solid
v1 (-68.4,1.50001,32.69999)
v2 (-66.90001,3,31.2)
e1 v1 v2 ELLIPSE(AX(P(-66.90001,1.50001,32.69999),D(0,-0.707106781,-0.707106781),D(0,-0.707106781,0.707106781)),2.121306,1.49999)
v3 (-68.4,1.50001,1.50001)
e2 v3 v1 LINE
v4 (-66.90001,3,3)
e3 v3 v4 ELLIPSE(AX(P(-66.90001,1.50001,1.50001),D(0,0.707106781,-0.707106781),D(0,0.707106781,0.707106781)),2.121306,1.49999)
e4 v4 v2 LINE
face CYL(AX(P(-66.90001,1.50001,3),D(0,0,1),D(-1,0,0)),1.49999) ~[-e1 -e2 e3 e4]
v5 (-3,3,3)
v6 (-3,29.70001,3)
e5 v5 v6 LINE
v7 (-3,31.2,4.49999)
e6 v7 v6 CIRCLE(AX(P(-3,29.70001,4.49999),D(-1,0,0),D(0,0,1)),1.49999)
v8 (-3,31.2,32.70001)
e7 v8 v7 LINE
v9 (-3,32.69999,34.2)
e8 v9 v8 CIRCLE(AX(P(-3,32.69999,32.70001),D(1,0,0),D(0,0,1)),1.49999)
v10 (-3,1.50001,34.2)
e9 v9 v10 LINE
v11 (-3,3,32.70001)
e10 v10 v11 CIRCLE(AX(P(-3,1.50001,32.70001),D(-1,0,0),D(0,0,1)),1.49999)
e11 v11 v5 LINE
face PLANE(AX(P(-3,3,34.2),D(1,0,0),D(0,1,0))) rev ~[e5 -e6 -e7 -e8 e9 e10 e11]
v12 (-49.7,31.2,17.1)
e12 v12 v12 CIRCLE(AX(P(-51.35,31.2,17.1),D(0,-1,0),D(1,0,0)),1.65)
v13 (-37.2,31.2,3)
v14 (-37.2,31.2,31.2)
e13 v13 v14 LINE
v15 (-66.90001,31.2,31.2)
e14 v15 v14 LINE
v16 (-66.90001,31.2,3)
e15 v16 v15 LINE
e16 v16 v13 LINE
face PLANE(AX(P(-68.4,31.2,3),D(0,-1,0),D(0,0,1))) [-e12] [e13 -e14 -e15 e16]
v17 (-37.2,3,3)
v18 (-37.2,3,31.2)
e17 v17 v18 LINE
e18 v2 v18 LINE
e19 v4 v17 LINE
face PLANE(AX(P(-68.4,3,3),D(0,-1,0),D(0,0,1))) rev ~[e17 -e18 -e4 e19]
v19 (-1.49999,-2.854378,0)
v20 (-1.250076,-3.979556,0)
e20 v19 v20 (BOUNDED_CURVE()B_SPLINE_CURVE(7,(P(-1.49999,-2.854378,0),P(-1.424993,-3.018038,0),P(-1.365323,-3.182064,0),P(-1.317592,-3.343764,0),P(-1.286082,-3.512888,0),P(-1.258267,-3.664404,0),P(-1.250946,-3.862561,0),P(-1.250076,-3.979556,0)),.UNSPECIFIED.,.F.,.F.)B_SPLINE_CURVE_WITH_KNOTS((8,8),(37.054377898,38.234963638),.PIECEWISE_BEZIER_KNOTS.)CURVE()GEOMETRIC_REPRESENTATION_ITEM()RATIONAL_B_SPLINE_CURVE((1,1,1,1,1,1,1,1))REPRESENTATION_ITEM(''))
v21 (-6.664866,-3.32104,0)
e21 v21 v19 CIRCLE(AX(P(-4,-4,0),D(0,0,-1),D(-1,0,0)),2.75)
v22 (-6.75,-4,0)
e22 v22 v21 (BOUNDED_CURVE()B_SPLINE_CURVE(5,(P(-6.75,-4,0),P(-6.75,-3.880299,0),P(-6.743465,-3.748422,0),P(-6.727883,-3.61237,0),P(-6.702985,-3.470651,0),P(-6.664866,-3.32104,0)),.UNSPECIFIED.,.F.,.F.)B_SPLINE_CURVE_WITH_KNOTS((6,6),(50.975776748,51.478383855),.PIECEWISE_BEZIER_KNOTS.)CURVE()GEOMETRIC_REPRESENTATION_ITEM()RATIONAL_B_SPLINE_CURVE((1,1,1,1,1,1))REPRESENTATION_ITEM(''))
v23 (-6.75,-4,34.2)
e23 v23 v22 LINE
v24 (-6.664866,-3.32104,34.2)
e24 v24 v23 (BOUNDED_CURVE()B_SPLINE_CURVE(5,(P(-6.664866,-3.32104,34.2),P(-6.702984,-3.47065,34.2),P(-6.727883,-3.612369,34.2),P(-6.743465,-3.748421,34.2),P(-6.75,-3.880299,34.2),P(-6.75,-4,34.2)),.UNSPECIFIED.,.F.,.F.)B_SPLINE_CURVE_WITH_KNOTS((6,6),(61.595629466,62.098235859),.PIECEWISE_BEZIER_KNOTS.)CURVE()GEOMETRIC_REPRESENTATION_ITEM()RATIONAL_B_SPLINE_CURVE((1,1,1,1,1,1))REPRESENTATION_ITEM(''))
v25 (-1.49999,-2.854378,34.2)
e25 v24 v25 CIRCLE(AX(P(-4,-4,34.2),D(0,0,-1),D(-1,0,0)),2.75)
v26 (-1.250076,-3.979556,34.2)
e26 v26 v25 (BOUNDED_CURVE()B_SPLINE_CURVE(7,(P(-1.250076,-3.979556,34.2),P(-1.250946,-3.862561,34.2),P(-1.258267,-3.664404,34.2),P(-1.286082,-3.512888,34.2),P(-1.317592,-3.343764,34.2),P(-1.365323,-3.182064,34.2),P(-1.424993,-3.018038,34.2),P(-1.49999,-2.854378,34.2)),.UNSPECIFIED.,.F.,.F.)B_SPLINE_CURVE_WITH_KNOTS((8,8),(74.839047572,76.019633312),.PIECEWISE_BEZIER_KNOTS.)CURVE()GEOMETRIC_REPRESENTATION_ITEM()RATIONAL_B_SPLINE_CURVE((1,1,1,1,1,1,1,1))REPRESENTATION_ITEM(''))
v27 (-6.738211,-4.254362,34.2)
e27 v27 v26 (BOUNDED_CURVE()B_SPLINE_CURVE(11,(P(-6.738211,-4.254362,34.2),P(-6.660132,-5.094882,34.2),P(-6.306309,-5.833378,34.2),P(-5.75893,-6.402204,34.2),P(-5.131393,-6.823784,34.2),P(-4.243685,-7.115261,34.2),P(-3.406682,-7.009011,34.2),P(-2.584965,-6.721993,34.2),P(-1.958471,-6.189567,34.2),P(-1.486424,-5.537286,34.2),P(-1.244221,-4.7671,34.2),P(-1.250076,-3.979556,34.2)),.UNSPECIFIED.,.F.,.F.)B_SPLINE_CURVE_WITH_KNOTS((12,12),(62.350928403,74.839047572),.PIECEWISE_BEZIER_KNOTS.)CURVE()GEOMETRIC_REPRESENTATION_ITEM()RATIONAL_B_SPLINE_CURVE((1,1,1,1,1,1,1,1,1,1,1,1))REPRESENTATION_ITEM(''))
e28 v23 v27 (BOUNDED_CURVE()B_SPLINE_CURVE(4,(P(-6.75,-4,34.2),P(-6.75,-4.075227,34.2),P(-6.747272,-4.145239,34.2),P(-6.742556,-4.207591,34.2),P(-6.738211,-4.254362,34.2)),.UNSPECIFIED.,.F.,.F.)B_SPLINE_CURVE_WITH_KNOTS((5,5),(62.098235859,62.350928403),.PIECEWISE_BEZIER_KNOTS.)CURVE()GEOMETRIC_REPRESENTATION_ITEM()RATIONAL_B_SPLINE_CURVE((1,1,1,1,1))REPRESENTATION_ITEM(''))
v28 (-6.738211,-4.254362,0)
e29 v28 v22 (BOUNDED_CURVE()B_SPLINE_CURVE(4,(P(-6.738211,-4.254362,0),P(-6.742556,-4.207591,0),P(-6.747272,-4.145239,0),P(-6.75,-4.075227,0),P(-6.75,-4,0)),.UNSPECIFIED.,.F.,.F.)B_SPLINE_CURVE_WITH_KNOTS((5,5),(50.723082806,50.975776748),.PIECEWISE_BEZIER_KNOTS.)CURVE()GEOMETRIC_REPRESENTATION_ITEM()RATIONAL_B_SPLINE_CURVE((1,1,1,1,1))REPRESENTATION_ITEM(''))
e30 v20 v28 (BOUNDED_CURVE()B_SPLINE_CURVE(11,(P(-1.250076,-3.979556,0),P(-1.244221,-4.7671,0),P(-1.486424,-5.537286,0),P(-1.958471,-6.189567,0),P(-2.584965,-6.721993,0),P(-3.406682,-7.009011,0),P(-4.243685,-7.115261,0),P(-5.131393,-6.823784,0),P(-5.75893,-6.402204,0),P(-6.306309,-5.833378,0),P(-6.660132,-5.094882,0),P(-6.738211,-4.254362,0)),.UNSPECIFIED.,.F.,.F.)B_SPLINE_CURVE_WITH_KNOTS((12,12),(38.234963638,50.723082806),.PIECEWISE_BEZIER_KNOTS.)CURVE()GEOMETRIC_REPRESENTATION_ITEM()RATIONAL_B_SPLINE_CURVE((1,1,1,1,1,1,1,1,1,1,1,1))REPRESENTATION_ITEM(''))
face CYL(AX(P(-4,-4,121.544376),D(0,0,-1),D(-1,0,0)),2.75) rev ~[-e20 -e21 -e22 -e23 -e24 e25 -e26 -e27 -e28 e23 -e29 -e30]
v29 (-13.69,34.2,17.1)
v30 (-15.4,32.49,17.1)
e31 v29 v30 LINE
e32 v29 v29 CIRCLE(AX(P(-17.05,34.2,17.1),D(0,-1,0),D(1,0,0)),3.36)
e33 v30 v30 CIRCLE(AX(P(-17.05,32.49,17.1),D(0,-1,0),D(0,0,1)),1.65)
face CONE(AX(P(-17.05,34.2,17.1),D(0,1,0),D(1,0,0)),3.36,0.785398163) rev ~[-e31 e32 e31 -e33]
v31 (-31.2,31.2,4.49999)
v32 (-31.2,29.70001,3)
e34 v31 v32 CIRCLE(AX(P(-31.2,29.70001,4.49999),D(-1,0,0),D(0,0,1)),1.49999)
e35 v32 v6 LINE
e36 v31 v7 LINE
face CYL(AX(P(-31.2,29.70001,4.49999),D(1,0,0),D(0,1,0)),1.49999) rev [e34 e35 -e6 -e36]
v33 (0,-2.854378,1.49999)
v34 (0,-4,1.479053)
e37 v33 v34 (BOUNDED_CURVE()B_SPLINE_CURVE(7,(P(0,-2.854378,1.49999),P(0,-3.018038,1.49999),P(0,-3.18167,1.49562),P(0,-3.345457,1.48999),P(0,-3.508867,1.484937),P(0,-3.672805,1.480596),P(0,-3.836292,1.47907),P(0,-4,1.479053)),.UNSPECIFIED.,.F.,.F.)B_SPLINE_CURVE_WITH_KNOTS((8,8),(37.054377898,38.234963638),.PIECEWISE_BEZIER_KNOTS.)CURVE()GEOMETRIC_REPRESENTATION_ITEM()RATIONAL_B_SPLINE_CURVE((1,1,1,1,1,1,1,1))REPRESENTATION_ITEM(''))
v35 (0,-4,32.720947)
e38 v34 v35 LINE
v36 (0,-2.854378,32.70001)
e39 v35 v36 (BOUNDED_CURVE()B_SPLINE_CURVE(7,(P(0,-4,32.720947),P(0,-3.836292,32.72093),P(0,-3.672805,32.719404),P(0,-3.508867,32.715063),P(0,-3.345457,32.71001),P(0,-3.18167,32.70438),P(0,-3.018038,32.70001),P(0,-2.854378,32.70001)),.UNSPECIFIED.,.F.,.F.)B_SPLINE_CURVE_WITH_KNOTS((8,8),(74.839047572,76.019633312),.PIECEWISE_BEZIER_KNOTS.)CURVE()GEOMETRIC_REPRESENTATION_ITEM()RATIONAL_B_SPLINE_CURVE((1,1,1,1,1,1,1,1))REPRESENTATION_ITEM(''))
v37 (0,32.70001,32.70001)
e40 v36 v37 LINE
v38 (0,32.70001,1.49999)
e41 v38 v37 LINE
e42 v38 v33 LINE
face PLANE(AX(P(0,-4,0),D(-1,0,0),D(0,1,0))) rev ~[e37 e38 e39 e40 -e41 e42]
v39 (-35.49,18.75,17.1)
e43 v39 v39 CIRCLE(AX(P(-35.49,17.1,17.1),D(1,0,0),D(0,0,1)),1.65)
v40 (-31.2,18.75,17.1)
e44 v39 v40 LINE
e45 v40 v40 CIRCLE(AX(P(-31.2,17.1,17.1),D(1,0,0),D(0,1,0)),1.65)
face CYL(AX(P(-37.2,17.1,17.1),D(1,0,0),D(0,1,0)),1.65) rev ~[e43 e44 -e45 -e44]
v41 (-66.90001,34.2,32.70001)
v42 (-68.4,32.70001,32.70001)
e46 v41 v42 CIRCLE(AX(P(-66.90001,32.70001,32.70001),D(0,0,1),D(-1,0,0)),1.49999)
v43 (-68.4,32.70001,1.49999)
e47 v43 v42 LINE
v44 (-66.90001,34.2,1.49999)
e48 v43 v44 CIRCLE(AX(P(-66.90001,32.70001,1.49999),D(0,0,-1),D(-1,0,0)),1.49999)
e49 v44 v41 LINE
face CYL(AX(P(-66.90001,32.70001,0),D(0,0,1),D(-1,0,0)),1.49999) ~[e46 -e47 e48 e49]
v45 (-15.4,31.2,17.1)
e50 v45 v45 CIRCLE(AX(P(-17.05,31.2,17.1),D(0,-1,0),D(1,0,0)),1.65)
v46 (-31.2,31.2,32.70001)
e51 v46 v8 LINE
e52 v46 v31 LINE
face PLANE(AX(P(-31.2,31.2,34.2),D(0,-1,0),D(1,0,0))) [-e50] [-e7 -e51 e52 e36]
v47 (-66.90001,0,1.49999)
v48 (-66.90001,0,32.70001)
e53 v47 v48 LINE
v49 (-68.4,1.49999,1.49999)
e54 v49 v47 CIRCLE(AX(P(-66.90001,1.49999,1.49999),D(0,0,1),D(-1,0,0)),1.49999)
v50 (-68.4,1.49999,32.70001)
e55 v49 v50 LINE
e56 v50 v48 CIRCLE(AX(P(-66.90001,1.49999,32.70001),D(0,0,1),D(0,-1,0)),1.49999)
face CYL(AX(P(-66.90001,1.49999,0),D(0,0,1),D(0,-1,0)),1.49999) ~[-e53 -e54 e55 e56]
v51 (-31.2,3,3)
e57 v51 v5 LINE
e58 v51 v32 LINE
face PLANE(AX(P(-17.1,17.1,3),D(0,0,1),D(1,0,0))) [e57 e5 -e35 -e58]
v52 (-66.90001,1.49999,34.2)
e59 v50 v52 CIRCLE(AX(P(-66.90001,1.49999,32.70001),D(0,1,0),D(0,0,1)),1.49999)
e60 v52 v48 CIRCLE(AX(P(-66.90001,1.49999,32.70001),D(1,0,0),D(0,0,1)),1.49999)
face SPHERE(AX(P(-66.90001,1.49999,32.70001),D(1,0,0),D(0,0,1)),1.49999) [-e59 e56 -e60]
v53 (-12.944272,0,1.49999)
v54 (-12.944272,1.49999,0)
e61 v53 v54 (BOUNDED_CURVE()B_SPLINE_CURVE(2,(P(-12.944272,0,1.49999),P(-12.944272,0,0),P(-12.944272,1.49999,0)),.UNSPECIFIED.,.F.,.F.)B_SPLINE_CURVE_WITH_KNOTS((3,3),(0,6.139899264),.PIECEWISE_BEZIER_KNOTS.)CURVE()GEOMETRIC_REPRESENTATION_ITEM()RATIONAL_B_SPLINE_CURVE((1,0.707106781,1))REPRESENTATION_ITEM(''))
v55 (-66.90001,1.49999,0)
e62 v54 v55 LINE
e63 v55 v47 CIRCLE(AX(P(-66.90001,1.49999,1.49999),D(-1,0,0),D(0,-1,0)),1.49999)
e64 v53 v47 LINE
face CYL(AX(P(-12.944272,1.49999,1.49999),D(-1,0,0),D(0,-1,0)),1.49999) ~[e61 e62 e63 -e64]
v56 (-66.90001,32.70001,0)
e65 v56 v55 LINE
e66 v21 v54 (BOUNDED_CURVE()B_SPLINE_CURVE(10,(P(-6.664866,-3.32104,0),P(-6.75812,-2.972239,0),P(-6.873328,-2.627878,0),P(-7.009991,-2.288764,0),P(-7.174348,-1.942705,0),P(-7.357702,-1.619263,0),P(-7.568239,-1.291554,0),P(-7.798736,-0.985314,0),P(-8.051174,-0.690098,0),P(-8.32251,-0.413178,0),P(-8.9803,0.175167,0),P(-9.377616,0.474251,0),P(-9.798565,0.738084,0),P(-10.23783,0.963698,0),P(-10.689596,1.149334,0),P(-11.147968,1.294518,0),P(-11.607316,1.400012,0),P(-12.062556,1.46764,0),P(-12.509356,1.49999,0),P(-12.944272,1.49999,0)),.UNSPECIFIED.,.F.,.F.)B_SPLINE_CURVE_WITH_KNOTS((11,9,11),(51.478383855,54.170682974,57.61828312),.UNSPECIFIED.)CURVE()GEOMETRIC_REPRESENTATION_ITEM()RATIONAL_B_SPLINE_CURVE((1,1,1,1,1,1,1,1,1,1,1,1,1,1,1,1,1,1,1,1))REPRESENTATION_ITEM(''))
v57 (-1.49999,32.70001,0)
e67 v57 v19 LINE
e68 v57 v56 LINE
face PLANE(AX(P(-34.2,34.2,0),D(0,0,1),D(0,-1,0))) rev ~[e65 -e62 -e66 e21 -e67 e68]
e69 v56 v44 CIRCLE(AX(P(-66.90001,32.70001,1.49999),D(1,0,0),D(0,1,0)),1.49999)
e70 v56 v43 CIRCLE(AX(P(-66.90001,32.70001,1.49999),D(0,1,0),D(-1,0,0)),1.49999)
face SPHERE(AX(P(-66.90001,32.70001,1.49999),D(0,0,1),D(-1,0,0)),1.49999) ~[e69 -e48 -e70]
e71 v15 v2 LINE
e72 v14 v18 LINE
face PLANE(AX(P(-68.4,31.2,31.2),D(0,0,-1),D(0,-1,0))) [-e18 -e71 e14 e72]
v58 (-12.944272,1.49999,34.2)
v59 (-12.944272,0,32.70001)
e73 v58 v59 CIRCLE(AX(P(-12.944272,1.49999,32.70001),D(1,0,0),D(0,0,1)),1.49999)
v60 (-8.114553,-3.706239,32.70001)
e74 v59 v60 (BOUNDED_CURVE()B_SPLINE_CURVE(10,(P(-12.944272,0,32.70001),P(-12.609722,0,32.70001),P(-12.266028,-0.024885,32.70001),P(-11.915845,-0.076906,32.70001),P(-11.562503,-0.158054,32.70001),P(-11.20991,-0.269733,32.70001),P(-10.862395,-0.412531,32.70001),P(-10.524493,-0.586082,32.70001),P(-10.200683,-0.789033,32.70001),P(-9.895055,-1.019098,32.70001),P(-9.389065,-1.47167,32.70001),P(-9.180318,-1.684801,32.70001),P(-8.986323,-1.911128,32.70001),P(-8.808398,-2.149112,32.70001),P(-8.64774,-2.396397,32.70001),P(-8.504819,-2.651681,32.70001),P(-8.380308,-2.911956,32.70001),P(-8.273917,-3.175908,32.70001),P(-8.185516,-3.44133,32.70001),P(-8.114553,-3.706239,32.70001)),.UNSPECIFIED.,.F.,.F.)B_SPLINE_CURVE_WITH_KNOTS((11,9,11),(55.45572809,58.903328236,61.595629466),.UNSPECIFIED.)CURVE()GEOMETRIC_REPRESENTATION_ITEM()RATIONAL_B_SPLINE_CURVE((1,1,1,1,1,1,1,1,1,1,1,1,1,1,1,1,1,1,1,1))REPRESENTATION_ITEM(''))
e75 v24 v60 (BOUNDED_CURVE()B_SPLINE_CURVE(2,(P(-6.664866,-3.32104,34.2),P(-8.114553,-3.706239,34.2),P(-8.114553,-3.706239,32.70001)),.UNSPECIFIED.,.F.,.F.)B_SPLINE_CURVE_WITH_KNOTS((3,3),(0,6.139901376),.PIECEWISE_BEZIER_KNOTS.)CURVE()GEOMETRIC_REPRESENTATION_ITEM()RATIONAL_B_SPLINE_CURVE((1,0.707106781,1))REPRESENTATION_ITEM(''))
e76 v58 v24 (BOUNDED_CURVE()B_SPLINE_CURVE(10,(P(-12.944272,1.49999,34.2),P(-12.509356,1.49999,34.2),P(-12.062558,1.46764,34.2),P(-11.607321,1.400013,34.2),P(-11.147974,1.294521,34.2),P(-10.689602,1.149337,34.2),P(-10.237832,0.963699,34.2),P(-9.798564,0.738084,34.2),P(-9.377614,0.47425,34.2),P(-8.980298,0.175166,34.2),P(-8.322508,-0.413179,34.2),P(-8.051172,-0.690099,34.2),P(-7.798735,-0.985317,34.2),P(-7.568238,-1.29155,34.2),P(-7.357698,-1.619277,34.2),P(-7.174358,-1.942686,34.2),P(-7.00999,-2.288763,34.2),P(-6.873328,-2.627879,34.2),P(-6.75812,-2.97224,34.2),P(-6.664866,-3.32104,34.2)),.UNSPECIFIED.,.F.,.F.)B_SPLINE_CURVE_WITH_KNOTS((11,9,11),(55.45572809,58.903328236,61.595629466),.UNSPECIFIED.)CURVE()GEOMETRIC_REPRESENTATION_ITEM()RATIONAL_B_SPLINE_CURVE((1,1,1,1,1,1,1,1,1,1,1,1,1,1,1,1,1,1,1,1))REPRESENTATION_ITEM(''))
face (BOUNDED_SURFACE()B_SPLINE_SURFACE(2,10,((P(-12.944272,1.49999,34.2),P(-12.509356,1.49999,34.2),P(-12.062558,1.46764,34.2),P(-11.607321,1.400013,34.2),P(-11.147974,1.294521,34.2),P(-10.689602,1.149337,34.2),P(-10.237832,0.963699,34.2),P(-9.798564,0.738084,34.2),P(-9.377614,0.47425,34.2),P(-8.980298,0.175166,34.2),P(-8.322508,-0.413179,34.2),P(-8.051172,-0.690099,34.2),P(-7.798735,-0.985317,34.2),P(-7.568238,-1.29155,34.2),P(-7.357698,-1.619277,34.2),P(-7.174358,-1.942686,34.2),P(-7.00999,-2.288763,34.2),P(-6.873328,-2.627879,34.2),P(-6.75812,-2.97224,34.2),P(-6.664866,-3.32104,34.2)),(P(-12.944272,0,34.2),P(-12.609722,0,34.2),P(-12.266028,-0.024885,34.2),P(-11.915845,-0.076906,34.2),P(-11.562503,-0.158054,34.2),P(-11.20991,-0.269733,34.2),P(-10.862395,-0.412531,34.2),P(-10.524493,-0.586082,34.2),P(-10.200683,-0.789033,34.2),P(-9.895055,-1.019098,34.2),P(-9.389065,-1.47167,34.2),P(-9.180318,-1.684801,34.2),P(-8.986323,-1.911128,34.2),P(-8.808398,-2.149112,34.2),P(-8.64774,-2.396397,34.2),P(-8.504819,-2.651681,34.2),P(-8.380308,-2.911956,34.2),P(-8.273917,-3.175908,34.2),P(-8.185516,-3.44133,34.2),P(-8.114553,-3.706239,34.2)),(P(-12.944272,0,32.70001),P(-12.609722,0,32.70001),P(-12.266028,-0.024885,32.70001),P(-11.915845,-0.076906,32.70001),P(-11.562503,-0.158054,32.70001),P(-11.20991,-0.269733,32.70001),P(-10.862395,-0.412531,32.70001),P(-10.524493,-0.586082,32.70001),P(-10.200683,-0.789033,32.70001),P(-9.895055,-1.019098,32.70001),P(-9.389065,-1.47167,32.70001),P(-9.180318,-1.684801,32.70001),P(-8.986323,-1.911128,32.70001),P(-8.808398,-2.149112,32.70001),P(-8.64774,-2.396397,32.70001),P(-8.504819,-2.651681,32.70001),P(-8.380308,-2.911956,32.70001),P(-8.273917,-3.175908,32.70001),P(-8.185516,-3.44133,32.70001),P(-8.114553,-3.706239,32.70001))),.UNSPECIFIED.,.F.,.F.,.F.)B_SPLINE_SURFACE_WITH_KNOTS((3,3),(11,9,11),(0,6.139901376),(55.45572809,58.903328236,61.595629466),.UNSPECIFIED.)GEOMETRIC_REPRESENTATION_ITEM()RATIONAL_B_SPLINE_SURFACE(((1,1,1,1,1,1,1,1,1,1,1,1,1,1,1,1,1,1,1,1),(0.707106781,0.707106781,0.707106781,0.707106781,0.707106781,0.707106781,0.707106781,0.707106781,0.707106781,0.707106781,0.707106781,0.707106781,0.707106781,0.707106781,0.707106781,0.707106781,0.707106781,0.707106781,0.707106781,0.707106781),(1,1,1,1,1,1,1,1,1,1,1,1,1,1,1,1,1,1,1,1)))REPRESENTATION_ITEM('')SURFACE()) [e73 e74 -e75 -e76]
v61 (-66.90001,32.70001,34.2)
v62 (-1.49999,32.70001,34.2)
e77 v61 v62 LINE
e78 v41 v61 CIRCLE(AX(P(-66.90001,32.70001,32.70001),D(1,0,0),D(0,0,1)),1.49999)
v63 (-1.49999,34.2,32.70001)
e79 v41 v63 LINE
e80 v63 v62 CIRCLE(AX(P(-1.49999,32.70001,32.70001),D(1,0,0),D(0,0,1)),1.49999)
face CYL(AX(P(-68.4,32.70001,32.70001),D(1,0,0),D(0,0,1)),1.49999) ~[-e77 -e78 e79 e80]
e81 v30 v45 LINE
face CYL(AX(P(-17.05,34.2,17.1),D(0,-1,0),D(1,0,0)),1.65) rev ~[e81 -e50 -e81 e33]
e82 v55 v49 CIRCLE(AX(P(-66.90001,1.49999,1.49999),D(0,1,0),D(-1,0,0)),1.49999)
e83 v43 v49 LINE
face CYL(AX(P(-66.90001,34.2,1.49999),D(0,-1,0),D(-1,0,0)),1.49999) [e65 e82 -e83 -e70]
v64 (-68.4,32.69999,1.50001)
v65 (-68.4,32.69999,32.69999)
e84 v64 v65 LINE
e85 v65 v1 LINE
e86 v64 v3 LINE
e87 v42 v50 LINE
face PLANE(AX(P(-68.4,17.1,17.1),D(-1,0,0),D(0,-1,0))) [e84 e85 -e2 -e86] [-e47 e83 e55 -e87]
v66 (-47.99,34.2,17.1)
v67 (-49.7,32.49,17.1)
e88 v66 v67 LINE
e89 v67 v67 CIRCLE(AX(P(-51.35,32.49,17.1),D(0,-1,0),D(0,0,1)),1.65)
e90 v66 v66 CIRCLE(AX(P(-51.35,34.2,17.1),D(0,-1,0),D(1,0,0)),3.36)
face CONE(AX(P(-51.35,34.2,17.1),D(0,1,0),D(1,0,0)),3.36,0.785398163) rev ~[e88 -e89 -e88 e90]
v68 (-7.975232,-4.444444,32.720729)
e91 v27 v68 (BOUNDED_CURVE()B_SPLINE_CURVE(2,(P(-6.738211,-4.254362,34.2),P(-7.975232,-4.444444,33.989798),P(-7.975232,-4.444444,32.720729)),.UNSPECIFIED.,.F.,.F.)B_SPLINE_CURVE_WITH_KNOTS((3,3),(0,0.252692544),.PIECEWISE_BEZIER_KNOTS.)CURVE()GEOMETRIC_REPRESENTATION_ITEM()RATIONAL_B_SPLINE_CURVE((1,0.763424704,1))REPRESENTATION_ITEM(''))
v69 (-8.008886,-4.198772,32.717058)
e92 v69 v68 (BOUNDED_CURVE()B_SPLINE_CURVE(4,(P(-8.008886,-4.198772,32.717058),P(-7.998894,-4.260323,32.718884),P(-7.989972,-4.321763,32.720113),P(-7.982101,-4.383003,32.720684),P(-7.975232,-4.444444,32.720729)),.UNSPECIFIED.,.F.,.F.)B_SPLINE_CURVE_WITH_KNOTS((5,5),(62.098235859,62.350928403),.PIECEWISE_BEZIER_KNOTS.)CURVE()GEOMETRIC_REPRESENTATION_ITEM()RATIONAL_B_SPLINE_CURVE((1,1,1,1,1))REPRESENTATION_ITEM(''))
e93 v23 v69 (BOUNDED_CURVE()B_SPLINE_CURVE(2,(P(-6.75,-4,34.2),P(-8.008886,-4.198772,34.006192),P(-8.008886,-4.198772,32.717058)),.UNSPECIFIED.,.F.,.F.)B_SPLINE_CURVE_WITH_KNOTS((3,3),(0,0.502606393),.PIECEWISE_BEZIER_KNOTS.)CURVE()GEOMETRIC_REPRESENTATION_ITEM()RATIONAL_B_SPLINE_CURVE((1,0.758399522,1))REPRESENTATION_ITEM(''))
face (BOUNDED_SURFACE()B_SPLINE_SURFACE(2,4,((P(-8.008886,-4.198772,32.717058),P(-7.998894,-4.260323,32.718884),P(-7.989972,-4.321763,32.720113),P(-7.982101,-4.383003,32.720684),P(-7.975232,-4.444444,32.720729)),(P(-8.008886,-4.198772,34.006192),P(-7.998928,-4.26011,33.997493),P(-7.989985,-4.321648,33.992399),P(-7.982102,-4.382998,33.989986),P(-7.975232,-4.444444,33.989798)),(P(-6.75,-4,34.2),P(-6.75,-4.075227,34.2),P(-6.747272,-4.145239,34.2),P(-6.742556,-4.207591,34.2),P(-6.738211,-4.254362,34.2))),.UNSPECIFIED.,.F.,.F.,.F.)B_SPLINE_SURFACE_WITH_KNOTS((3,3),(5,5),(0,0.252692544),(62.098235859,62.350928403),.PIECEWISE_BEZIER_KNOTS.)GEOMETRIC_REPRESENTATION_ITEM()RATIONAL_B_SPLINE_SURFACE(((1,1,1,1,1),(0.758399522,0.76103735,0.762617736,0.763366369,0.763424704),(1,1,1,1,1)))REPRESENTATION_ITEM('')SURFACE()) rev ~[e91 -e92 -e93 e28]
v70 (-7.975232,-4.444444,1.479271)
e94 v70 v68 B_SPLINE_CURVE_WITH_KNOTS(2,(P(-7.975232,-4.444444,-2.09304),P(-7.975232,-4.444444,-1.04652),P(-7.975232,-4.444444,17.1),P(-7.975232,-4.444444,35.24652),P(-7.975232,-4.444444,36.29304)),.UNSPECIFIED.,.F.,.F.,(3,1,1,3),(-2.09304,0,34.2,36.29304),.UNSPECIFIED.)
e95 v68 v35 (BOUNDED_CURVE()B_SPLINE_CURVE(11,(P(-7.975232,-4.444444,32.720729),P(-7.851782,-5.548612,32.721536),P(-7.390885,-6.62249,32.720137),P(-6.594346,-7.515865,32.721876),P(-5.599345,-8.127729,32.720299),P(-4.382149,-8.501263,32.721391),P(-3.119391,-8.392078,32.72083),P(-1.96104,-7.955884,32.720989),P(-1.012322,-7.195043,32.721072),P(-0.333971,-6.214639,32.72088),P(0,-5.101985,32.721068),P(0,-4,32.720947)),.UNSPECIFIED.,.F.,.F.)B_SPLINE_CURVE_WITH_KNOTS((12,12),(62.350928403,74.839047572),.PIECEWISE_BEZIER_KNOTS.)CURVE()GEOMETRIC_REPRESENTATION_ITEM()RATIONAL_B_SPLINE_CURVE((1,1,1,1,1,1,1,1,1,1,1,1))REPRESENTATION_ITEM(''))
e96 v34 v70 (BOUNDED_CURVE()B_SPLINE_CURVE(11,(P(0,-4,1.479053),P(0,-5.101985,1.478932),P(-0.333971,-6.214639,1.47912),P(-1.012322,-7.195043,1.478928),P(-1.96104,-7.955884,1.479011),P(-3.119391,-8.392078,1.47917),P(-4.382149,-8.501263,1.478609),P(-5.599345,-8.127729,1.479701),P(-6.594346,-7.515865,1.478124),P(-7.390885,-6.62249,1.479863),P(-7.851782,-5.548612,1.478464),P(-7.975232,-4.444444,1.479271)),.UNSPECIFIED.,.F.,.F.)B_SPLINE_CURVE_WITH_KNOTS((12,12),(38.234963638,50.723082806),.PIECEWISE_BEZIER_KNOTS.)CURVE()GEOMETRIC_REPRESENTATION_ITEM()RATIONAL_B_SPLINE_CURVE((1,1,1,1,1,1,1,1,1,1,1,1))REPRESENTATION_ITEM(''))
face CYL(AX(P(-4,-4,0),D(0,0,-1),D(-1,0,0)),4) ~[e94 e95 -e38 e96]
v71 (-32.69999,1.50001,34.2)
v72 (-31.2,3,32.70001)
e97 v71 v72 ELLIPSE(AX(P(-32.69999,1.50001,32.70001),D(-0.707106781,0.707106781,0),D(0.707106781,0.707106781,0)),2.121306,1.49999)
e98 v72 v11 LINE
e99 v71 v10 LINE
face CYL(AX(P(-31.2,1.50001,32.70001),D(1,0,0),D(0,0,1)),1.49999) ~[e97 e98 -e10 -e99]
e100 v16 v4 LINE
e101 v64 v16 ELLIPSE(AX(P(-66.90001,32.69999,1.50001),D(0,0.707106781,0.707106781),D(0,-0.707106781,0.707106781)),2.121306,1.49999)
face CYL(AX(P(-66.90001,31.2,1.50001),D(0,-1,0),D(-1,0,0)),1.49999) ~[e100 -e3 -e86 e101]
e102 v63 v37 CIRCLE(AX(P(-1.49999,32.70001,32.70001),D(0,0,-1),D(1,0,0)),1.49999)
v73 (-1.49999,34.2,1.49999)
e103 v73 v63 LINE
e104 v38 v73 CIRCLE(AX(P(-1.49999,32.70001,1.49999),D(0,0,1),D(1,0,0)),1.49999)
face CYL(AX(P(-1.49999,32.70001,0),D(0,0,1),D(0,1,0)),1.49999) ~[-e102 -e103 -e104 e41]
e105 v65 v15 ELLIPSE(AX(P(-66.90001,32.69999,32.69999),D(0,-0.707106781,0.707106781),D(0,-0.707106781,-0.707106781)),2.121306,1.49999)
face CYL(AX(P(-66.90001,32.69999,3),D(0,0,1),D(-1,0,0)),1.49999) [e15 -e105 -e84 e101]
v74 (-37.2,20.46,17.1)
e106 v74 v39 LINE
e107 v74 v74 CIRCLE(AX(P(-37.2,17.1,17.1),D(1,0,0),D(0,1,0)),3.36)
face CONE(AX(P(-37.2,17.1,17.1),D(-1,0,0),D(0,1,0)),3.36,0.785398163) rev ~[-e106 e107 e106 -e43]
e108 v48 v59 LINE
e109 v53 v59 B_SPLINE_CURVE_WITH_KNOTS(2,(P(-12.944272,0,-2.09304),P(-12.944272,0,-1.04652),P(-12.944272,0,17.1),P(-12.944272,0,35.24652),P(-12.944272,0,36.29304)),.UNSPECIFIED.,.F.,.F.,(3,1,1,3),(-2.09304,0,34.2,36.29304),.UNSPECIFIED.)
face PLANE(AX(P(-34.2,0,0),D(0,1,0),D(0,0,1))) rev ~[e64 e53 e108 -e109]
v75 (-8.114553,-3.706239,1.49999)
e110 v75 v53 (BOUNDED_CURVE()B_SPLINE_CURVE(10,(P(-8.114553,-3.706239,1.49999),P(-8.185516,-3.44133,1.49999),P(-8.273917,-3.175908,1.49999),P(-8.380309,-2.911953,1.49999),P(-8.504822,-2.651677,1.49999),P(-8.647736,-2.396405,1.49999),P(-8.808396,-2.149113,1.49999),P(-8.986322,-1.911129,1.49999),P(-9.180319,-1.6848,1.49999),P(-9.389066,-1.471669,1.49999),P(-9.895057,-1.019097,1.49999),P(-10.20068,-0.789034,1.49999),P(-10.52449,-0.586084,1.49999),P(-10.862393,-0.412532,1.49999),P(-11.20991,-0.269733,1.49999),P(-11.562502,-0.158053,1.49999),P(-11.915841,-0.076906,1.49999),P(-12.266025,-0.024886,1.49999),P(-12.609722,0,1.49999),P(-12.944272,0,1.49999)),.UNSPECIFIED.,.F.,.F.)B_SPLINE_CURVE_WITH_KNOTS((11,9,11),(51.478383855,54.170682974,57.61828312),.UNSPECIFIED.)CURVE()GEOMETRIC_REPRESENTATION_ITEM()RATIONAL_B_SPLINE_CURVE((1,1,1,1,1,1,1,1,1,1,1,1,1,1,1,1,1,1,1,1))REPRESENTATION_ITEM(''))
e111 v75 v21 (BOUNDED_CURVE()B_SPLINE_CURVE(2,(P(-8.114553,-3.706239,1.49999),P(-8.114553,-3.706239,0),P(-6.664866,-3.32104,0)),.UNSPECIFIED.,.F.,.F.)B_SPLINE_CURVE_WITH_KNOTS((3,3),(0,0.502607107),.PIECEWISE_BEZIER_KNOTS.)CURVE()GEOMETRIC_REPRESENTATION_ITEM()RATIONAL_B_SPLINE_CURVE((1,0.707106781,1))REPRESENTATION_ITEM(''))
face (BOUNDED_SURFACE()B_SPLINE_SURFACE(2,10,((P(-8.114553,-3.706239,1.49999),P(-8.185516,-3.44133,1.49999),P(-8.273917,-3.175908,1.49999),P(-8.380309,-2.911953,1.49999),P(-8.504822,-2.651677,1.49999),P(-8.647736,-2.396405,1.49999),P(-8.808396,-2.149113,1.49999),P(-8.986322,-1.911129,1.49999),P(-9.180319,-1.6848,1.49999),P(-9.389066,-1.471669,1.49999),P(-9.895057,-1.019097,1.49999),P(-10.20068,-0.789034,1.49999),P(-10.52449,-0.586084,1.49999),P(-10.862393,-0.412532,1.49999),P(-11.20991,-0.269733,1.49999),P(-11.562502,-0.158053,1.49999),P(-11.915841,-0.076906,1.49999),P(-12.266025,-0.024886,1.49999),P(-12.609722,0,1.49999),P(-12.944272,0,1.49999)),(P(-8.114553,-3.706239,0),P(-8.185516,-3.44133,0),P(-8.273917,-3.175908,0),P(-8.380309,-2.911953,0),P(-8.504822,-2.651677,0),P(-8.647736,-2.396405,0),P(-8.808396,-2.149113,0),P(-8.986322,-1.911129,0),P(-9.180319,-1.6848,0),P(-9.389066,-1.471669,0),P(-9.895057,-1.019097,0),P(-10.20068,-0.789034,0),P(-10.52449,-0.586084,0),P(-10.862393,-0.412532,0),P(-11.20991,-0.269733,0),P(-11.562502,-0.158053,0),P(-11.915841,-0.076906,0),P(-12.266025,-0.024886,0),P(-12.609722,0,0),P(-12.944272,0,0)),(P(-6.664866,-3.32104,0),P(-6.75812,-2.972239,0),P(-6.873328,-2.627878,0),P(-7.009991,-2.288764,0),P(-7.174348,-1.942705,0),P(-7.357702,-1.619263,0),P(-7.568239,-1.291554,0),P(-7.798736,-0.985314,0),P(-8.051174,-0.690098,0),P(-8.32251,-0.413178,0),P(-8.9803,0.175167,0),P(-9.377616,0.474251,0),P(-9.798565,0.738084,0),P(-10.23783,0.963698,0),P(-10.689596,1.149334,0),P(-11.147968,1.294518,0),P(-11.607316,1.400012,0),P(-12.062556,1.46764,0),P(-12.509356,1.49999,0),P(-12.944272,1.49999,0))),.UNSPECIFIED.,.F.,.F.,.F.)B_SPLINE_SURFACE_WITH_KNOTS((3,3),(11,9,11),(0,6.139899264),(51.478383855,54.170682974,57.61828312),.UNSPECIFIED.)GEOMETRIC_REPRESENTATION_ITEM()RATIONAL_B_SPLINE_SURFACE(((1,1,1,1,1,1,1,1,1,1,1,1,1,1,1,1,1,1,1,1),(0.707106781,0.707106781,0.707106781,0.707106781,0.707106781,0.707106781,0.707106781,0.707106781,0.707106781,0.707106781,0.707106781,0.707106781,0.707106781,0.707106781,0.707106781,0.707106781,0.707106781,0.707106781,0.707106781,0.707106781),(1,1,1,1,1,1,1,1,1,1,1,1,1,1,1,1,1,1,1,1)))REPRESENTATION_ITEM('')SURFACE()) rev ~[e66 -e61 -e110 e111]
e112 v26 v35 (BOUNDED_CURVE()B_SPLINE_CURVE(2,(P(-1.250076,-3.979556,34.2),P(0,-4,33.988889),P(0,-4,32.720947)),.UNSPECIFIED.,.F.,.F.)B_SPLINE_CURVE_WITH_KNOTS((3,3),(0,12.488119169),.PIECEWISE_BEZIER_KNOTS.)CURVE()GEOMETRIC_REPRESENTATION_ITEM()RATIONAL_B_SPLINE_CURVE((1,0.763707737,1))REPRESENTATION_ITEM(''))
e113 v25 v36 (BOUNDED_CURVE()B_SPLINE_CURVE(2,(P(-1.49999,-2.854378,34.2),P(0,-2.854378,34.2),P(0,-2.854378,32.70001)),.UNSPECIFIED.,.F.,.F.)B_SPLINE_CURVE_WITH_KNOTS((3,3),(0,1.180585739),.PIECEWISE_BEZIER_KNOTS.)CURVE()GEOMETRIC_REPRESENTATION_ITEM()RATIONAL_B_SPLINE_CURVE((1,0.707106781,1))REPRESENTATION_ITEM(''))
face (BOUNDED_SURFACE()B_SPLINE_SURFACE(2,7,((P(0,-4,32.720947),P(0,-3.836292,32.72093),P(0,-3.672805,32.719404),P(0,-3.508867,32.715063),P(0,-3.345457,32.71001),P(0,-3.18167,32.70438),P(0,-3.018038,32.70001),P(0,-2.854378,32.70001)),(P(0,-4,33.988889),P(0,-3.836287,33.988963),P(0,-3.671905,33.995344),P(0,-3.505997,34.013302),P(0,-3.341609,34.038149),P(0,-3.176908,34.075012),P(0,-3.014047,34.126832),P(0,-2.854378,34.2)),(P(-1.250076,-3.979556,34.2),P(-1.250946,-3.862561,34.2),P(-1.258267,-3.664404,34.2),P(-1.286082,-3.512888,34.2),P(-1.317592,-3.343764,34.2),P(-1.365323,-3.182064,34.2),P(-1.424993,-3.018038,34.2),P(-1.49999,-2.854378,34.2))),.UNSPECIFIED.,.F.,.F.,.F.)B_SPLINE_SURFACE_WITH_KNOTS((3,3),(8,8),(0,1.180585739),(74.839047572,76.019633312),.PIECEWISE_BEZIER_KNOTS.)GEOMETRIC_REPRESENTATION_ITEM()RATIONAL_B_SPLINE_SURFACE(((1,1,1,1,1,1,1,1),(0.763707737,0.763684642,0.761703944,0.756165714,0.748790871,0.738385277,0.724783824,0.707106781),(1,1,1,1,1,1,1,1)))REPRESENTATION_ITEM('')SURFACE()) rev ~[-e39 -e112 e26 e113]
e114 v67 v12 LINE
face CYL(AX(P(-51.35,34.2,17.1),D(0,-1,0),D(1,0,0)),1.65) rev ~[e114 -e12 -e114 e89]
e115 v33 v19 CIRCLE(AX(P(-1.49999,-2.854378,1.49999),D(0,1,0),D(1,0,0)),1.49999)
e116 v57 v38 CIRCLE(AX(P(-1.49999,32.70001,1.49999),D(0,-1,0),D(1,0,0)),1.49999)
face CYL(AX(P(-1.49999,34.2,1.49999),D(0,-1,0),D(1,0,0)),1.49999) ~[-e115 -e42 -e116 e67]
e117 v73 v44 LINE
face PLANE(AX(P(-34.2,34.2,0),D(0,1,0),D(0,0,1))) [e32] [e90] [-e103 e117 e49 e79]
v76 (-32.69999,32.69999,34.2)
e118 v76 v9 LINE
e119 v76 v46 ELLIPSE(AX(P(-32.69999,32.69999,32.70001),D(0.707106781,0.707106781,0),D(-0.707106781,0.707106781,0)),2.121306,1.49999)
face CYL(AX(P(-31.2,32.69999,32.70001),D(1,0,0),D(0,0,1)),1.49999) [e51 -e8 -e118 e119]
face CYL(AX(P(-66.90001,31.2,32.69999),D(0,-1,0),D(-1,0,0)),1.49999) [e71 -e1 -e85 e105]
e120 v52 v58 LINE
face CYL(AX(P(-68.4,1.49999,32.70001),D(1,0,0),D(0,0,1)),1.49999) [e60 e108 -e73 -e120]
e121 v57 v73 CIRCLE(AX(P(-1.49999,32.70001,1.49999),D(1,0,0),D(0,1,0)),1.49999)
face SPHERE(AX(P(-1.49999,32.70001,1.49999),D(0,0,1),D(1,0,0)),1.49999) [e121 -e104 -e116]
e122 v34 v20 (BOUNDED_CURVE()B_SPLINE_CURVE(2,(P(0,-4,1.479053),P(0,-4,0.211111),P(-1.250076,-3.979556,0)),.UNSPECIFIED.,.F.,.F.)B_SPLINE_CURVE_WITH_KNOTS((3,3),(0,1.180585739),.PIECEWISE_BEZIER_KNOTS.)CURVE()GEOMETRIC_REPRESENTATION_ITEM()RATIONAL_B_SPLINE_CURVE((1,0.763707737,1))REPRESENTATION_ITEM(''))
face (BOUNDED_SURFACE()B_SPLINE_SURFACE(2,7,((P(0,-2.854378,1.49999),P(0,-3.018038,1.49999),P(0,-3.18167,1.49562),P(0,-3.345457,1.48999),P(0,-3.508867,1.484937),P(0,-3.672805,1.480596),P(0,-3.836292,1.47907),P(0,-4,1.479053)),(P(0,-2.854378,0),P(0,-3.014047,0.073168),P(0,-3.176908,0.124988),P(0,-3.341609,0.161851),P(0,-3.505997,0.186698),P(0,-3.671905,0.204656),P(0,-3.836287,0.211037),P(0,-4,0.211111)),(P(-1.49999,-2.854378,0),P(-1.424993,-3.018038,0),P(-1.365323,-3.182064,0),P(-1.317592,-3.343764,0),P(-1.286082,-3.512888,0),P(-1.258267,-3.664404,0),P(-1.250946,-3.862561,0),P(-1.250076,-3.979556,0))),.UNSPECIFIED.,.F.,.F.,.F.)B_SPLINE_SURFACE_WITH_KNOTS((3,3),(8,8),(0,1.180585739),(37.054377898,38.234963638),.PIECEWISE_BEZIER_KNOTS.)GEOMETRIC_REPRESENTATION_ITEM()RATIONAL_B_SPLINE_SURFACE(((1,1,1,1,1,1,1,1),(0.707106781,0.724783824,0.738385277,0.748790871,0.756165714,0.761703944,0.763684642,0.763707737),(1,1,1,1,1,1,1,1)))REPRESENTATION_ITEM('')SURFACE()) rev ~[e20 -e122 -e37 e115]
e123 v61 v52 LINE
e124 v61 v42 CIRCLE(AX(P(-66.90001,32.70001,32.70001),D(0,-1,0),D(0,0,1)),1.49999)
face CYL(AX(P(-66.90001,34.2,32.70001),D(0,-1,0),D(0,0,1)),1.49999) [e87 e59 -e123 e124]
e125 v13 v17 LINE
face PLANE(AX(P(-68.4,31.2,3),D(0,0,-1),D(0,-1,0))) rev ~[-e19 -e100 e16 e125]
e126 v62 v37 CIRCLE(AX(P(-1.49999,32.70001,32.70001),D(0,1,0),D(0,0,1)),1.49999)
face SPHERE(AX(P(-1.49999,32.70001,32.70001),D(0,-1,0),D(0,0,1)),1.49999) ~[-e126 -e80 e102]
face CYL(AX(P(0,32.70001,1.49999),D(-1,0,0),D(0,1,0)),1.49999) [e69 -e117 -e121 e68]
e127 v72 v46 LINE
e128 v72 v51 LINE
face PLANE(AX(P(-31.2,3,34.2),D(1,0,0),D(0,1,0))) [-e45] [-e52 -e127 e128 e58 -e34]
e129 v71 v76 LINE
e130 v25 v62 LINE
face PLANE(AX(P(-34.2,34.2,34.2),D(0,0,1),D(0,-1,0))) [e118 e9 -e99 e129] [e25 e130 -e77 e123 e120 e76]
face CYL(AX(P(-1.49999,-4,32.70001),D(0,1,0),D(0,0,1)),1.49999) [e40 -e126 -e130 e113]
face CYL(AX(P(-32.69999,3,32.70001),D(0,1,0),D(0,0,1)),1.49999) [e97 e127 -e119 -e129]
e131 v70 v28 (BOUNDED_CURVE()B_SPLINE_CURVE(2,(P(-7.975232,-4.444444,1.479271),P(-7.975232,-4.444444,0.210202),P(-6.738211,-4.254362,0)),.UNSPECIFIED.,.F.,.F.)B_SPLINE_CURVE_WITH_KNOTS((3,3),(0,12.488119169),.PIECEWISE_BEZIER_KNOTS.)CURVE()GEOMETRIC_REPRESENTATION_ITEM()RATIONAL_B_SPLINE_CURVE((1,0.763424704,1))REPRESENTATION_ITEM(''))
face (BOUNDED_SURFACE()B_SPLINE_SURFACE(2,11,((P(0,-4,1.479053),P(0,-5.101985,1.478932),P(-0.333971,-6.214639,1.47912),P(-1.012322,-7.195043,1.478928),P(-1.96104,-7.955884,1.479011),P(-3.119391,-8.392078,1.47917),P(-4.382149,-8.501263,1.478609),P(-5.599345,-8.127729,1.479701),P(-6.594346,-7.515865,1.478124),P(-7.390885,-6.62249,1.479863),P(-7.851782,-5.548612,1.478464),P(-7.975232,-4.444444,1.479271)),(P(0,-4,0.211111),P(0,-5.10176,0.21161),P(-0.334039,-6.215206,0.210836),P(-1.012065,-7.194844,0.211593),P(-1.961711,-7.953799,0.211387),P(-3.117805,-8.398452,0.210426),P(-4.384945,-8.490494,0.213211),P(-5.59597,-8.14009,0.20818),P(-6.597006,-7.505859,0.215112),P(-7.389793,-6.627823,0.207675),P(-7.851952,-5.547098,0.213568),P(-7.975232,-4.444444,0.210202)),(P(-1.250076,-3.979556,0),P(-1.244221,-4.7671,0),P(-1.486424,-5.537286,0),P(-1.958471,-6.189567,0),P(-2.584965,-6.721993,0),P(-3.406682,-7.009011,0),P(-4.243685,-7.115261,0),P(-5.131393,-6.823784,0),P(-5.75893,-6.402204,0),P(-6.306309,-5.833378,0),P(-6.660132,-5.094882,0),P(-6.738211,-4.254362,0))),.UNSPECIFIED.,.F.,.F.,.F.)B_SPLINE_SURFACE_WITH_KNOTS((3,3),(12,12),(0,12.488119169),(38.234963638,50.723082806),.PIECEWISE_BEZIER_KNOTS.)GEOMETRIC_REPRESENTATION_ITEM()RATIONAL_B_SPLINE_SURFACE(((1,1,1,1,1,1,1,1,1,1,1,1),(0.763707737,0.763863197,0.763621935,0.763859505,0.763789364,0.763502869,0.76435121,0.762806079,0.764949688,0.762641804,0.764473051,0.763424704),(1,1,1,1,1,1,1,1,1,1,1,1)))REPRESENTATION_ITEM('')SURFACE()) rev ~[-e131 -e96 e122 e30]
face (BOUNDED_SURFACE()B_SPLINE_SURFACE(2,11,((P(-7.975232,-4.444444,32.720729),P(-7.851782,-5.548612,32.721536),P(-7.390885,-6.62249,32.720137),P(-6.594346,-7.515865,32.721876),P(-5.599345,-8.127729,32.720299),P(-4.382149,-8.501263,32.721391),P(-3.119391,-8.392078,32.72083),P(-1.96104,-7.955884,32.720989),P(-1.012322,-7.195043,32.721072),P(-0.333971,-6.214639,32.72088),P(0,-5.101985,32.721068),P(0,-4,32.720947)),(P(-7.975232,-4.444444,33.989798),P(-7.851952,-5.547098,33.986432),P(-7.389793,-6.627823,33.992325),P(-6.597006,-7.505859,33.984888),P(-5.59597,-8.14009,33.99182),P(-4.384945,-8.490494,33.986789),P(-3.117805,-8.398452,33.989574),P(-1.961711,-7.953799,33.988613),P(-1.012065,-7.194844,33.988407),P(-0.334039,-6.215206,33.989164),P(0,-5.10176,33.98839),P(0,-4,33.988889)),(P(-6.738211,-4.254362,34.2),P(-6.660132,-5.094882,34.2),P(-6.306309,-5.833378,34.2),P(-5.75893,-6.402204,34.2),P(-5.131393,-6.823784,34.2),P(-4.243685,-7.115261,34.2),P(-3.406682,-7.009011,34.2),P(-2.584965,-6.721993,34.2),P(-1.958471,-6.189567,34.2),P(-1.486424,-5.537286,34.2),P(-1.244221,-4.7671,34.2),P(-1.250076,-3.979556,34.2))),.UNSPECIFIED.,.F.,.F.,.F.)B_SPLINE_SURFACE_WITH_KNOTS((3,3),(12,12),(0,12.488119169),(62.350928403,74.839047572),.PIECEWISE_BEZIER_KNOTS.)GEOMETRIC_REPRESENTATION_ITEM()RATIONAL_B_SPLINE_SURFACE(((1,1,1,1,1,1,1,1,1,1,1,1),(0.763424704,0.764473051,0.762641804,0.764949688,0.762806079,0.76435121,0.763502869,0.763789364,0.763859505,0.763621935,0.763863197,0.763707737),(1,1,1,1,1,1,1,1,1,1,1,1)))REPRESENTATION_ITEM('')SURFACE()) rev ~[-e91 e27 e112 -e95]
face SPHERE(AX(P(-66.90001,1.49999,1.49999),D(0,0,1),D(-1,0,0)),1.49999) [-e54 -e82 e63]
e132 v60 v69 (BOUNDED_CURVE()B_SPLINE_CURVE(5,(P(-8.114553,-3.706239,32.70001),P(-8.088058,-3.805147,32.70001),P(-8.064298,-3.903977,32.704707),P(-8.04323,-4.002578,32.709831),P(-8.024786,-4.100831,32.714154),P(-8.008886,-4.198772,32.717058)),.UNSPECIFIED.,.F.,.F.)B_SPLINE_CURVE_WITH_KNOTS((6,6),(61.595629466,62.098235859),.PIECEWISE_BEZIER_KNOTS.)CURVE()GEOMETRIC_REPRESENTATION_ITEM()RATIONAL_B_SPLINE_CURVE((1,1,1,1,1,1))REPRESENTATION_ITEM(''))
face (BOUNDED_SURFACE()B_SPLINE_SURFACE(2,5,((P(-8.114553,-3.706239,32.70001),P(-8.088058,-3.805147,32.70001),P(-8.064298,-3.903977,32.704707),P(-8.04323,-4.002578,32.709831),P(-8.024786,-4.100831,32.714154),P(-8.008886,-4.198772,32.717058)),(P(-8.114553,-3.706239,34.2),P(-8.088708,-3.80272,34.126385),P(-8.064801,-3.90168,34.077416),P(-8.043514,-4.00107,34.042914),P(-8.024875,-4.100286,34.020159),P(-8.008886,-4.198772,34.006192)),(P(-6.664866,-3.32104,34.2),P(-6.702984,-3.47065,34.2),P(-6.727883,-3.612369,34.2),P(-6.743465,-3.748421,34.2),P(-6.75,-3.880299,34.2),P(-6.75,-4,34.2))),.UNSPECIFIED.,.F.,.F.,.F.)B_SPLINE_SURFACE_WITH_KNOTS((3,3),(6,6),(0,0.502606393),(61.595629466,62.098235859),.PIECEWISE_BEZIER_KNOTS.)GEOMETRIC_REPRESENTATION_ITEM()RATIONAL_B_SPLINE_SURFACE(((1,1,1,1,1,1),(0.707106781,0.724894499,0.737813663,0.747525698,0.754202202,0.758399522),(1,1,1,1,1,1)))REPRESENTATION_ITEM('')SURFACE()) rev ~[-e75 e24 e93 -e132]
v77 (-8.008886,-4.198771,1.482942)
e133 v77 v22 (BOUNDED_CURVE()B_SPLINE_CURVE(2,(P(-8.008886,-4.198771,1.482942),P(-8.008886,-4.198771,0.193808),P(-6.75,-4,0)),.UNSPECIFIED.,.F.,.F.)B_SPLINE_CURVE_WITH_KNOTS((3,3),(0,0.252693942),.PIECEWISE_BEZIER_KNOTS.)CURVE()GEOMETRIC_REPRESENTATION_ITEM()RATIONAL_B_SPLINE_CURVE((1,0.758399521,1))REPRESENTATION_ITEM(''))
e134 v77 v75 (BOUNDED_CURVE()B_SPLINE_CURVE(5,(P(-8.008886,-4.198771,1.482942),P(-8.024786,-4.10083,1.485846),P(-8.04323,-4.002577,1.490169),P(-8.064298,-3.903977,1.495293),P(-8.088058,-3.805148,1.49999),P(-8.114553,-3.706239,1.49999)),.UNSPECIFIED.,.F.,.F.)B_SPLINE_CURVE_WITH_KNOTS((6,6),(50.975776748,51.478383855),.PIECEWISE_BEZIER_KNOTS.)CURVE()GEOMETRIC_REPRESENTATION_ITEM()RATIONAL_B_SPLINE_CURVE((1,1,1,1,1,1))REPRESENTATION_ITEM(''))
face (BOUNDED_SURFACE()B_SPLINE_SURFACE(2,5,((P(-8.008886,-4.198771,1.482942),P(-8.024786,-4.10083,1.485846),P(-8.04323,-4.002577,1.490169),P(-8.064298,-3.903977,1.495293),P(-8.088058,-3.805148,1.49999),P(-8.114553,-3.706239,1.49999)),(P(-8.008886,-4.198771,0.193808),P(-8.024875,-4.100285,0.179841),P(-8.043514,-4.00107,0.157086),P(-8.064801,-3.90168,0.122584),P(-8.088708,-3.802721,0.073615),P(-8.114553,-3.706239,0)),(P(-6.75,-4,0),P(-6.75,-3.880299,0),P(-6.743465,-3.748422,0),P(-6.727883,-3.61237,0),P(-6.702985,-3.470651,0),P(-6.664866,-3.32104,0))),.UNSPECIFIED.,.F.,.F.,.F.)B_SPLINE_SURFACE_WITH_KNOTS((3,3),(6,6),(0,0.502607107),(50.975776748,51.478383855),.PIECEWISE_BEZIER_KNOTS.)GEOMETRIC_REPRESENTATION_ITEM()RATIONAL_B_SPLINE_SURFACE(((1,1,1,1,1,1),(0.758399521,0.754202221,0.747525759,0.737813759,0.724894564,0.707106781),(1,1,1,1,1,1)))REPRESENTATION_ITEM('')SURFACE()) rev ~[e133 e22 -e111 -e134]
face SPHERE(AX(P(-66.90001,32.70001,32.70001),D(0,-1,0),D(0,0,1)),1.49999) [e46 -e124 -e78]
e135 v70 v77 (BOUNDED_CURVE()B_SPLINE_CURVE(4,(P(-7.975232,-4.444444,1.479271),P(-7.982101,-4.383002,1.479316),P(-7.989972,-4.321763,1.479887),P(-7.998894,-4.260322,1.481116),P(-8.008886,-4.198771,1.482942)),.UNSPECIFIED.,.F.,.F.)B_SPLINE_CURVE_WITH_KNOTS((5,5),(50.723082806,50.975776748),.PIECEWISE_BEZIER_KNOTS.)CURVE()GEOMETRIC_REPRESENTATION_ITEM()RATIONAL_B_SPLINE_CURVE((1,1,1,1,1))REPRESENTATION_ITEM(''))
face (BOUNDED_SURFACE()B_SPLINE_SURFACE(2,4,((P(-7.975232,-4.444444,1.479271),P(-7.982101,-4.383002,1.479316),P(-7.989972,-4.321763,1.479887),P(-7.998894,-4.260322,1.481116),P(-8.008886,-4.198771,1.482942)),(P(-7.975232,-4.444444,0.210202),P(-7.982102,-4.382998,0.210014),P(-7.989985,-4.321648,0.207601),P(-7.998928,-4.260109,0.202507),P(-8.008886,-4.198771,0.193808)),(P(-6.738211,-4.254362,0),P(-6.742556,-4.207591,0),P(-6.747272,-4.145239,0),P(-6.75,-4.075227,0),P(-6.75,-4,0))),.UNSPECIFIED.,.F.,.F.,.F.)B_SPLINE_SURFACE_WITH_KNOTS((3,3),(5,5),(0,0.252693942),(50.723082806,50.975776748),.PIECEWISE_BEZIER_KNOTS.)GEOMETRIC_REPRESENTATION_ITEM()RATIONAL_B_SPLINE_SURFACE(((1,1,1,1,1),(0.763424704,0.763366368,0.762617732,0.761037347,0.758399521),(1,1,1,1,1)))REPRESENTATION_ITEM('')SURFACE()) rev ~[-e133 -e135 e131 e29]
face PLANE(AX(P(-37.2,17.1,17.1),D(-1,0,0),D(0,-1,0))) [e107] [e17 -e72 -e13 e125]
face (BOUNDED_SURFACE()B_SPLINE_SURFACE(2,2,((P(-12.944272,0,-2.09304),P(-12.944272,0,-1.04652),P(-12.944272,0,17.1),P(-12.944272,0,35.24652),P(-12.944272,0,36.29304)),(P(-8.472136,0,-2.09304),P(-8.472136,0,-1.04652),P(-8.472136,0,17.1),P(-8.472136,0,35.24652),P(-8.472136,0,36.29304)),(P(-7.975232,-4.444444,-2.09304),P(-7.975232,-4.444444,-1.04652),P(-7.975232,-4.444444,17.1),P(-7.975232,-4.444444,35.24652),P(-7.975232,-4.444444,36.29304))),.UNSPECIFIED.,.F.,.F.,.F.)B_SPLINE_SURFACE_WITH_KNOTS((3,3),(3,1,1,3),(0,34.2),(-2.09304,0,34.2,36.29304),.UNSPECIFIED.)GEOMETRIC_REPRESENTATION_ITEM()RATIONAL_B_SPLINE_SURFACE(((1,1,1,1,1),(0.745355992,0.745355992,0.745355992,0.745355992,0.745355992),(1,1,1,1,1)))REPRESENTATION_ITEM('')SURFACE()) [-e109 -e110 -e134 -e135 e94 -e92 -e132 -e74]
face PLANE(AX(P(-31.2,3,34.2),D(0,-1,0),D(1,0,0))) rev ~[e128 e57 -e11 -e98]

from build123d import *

# Parameters (mm, degrees)
F1_DEPTH              = 34.2
F2_W                  = 28.2
F2_H                  = 28.2
F3_DEPTH              = 31.2
F4_W                  = 34.2
F4_H                  = 34.2
F5_DEPTH              = 34.2
F6_W                  = 28.2
F6_H                  = 28.2
F7_DEPTH              = 31.2
F10_D                 = 3.3
F10_DEPTH             = 25
F10_CSINK_D           = 6.72
F10_CSINK_ANGLE       = 90
F10_TIP               = 0.9914200214
F10_ON_F9_D           = 3.3
F10_ON_F9_DEPTH       = 25
F10_ON_F9_CSINK_D     = 6.72
F10_ON_F9_CSINK_ANGLE = 90
F10_ON_F9_TIP         = 0.9914200214
F12_D                 = 5.5
F13_R                 = 5
F14_R                 = 1.49999


# Not quite as in the source:
# - a fillet or chamfer is up to 0.001 mm smaller than in the source, because OpenCascade refuses the exact size


with BuildPart() as f1:
    # F0 (on Top) → F1 (new body)
    with BuildSketch(Plane.XY):
        Polygon((-34.2, 0), (-8, 0), (0, 0), (0, 34.2), (-34.2, 34.2), align=None)
        with BuildLine():
            Line((0, 0), (-8, 0))
            Line((-8, 0), (-8, -4))
            ThreePointArc((-8, -4), (-4, -8), (0, -4))
            Line((0, -4), (0, 0))
        make_face()
    extrude(amount=F1_DEPTH)

    # F2 (on face) → F3 (cut)
    with BuildSketch(Plane.XY.offset(34.2)):
        with Locations((-17.1, 17.1)):
            Rectangle(F2_W, F2_H)
    extrude(amount=-F3_DEPTH, mode=Mode.SUBTRACT)

    # F4 (on face) → F5 (join)
    with BuildSketch(Plane(origin=(-34.2, 0, 0), x_dir=(0, -1, 0), z_dir=(-1, 0, 0))):
        with Locations((-17.1, 17.1)):
            Rectangle(F4_W, F4_H)
    extrude(amount=F5_DEPTH)

    # F6 (on face) → F7 (cut)
    with BuildSketch(Plane(origin=(-68.4, 0, 0), x_dir=(0, -1, 0), z_dir=(-1, 0, 0))):
        with Locations((-17.1, 17.1)):
            Rectangle(F6_W, F6_H)
    extrude(amount=-F7_DEPTH, mode=Mode.SUBTRACT)

    # F10
    with Locations(Plane(origin=(0, 34.2, 0), x_dir=(-1, 0, 0), z_dir=(0, 1, 0))):
        with Locations((17.05, 17.1), (51.35, 17.1)):
            CounterSinkHole(F10_D / 2, F10_CSINK_D / 2, depth=F10_DEPTH, counter_sink_angle=F10_CSINK_ANGLE)
            with Locations((0, 0, -(F10_DEPTH + F10_TIP / 2))):  # 118° drill point
                Cone(0, F10_D / 2, F10_TIP, mode=Mode.SUBTRACT)

    # F10 on F9
    with Locations(Plane(origin=(-37.2, 0, 0), x_dir=(0, -1, 0), z_dir=(-1, 0, 0))):
        with Locations((-17.1, 17.1)):
            CounterSinkHole(F10_ON_F9_D / 2, F10_ON_F9_CSINK_D / 2, depth=F10_ON_F9_DEPTH, counter_sink_angle=F10_ON_F9_CSINK_ANGLE)
            with Locations((0, 0, -(F10_ON_F9_DEPTH + F10_ON_F9_TIP / 2))):  # 118° drill point
                Cone(0, F10_ON_F9_D / 2, F10_ON_F9_TIP, mode=Mode.SUBTRACT)

    # F12 (through all)
    with Locations(Plane.XY.offset(34.2)):
        with Locations((-4, -4)):
            Hole(F12_D / 2)

    # F13
    f13_edges = [f1.edges().sort_by_distance(p)[0] for p in [
        (-8, 0, 17.1),
    ]]
    fillet(f13_edges, radius=F13_R)

    # F14 (radius 1.5 in the source; OpenCascade refuses exactly that, so slightly less here)
    f14_edges = [f1.edges().sort_by_distance(p)[0] for p in [
        (-17.1, 3, 34.2),
        (-31.2, 17.1, 34.2),
        (-17.1, 31.2, 34.2),
        (-17.1, 31.2, 3),
        (0, 15.1, 34.2),
        (-40.672136, 0, 34.2),
        (-68.4, 17.1, 34.2),
        (-34.2, 34.2, 34.2),
        (0, 34.2, 17.1),
        (-68.4, 17.1, 31.2),
        (-68.4, 0, 17.1),
        (-68.4, 3, 17.1),
        (-68.4, 31.2, 17.1),
        (-68.4, 34.2, 17.1),
        (-68.4, 17.1, 3),
        (-68.4, 17.1, 0),
        (-40.672136, 0, 0),
        (-34.2, 34.2, 0),
    ]]
    fillet(f14_edges, radius=F14_R)


solid = f1.part
